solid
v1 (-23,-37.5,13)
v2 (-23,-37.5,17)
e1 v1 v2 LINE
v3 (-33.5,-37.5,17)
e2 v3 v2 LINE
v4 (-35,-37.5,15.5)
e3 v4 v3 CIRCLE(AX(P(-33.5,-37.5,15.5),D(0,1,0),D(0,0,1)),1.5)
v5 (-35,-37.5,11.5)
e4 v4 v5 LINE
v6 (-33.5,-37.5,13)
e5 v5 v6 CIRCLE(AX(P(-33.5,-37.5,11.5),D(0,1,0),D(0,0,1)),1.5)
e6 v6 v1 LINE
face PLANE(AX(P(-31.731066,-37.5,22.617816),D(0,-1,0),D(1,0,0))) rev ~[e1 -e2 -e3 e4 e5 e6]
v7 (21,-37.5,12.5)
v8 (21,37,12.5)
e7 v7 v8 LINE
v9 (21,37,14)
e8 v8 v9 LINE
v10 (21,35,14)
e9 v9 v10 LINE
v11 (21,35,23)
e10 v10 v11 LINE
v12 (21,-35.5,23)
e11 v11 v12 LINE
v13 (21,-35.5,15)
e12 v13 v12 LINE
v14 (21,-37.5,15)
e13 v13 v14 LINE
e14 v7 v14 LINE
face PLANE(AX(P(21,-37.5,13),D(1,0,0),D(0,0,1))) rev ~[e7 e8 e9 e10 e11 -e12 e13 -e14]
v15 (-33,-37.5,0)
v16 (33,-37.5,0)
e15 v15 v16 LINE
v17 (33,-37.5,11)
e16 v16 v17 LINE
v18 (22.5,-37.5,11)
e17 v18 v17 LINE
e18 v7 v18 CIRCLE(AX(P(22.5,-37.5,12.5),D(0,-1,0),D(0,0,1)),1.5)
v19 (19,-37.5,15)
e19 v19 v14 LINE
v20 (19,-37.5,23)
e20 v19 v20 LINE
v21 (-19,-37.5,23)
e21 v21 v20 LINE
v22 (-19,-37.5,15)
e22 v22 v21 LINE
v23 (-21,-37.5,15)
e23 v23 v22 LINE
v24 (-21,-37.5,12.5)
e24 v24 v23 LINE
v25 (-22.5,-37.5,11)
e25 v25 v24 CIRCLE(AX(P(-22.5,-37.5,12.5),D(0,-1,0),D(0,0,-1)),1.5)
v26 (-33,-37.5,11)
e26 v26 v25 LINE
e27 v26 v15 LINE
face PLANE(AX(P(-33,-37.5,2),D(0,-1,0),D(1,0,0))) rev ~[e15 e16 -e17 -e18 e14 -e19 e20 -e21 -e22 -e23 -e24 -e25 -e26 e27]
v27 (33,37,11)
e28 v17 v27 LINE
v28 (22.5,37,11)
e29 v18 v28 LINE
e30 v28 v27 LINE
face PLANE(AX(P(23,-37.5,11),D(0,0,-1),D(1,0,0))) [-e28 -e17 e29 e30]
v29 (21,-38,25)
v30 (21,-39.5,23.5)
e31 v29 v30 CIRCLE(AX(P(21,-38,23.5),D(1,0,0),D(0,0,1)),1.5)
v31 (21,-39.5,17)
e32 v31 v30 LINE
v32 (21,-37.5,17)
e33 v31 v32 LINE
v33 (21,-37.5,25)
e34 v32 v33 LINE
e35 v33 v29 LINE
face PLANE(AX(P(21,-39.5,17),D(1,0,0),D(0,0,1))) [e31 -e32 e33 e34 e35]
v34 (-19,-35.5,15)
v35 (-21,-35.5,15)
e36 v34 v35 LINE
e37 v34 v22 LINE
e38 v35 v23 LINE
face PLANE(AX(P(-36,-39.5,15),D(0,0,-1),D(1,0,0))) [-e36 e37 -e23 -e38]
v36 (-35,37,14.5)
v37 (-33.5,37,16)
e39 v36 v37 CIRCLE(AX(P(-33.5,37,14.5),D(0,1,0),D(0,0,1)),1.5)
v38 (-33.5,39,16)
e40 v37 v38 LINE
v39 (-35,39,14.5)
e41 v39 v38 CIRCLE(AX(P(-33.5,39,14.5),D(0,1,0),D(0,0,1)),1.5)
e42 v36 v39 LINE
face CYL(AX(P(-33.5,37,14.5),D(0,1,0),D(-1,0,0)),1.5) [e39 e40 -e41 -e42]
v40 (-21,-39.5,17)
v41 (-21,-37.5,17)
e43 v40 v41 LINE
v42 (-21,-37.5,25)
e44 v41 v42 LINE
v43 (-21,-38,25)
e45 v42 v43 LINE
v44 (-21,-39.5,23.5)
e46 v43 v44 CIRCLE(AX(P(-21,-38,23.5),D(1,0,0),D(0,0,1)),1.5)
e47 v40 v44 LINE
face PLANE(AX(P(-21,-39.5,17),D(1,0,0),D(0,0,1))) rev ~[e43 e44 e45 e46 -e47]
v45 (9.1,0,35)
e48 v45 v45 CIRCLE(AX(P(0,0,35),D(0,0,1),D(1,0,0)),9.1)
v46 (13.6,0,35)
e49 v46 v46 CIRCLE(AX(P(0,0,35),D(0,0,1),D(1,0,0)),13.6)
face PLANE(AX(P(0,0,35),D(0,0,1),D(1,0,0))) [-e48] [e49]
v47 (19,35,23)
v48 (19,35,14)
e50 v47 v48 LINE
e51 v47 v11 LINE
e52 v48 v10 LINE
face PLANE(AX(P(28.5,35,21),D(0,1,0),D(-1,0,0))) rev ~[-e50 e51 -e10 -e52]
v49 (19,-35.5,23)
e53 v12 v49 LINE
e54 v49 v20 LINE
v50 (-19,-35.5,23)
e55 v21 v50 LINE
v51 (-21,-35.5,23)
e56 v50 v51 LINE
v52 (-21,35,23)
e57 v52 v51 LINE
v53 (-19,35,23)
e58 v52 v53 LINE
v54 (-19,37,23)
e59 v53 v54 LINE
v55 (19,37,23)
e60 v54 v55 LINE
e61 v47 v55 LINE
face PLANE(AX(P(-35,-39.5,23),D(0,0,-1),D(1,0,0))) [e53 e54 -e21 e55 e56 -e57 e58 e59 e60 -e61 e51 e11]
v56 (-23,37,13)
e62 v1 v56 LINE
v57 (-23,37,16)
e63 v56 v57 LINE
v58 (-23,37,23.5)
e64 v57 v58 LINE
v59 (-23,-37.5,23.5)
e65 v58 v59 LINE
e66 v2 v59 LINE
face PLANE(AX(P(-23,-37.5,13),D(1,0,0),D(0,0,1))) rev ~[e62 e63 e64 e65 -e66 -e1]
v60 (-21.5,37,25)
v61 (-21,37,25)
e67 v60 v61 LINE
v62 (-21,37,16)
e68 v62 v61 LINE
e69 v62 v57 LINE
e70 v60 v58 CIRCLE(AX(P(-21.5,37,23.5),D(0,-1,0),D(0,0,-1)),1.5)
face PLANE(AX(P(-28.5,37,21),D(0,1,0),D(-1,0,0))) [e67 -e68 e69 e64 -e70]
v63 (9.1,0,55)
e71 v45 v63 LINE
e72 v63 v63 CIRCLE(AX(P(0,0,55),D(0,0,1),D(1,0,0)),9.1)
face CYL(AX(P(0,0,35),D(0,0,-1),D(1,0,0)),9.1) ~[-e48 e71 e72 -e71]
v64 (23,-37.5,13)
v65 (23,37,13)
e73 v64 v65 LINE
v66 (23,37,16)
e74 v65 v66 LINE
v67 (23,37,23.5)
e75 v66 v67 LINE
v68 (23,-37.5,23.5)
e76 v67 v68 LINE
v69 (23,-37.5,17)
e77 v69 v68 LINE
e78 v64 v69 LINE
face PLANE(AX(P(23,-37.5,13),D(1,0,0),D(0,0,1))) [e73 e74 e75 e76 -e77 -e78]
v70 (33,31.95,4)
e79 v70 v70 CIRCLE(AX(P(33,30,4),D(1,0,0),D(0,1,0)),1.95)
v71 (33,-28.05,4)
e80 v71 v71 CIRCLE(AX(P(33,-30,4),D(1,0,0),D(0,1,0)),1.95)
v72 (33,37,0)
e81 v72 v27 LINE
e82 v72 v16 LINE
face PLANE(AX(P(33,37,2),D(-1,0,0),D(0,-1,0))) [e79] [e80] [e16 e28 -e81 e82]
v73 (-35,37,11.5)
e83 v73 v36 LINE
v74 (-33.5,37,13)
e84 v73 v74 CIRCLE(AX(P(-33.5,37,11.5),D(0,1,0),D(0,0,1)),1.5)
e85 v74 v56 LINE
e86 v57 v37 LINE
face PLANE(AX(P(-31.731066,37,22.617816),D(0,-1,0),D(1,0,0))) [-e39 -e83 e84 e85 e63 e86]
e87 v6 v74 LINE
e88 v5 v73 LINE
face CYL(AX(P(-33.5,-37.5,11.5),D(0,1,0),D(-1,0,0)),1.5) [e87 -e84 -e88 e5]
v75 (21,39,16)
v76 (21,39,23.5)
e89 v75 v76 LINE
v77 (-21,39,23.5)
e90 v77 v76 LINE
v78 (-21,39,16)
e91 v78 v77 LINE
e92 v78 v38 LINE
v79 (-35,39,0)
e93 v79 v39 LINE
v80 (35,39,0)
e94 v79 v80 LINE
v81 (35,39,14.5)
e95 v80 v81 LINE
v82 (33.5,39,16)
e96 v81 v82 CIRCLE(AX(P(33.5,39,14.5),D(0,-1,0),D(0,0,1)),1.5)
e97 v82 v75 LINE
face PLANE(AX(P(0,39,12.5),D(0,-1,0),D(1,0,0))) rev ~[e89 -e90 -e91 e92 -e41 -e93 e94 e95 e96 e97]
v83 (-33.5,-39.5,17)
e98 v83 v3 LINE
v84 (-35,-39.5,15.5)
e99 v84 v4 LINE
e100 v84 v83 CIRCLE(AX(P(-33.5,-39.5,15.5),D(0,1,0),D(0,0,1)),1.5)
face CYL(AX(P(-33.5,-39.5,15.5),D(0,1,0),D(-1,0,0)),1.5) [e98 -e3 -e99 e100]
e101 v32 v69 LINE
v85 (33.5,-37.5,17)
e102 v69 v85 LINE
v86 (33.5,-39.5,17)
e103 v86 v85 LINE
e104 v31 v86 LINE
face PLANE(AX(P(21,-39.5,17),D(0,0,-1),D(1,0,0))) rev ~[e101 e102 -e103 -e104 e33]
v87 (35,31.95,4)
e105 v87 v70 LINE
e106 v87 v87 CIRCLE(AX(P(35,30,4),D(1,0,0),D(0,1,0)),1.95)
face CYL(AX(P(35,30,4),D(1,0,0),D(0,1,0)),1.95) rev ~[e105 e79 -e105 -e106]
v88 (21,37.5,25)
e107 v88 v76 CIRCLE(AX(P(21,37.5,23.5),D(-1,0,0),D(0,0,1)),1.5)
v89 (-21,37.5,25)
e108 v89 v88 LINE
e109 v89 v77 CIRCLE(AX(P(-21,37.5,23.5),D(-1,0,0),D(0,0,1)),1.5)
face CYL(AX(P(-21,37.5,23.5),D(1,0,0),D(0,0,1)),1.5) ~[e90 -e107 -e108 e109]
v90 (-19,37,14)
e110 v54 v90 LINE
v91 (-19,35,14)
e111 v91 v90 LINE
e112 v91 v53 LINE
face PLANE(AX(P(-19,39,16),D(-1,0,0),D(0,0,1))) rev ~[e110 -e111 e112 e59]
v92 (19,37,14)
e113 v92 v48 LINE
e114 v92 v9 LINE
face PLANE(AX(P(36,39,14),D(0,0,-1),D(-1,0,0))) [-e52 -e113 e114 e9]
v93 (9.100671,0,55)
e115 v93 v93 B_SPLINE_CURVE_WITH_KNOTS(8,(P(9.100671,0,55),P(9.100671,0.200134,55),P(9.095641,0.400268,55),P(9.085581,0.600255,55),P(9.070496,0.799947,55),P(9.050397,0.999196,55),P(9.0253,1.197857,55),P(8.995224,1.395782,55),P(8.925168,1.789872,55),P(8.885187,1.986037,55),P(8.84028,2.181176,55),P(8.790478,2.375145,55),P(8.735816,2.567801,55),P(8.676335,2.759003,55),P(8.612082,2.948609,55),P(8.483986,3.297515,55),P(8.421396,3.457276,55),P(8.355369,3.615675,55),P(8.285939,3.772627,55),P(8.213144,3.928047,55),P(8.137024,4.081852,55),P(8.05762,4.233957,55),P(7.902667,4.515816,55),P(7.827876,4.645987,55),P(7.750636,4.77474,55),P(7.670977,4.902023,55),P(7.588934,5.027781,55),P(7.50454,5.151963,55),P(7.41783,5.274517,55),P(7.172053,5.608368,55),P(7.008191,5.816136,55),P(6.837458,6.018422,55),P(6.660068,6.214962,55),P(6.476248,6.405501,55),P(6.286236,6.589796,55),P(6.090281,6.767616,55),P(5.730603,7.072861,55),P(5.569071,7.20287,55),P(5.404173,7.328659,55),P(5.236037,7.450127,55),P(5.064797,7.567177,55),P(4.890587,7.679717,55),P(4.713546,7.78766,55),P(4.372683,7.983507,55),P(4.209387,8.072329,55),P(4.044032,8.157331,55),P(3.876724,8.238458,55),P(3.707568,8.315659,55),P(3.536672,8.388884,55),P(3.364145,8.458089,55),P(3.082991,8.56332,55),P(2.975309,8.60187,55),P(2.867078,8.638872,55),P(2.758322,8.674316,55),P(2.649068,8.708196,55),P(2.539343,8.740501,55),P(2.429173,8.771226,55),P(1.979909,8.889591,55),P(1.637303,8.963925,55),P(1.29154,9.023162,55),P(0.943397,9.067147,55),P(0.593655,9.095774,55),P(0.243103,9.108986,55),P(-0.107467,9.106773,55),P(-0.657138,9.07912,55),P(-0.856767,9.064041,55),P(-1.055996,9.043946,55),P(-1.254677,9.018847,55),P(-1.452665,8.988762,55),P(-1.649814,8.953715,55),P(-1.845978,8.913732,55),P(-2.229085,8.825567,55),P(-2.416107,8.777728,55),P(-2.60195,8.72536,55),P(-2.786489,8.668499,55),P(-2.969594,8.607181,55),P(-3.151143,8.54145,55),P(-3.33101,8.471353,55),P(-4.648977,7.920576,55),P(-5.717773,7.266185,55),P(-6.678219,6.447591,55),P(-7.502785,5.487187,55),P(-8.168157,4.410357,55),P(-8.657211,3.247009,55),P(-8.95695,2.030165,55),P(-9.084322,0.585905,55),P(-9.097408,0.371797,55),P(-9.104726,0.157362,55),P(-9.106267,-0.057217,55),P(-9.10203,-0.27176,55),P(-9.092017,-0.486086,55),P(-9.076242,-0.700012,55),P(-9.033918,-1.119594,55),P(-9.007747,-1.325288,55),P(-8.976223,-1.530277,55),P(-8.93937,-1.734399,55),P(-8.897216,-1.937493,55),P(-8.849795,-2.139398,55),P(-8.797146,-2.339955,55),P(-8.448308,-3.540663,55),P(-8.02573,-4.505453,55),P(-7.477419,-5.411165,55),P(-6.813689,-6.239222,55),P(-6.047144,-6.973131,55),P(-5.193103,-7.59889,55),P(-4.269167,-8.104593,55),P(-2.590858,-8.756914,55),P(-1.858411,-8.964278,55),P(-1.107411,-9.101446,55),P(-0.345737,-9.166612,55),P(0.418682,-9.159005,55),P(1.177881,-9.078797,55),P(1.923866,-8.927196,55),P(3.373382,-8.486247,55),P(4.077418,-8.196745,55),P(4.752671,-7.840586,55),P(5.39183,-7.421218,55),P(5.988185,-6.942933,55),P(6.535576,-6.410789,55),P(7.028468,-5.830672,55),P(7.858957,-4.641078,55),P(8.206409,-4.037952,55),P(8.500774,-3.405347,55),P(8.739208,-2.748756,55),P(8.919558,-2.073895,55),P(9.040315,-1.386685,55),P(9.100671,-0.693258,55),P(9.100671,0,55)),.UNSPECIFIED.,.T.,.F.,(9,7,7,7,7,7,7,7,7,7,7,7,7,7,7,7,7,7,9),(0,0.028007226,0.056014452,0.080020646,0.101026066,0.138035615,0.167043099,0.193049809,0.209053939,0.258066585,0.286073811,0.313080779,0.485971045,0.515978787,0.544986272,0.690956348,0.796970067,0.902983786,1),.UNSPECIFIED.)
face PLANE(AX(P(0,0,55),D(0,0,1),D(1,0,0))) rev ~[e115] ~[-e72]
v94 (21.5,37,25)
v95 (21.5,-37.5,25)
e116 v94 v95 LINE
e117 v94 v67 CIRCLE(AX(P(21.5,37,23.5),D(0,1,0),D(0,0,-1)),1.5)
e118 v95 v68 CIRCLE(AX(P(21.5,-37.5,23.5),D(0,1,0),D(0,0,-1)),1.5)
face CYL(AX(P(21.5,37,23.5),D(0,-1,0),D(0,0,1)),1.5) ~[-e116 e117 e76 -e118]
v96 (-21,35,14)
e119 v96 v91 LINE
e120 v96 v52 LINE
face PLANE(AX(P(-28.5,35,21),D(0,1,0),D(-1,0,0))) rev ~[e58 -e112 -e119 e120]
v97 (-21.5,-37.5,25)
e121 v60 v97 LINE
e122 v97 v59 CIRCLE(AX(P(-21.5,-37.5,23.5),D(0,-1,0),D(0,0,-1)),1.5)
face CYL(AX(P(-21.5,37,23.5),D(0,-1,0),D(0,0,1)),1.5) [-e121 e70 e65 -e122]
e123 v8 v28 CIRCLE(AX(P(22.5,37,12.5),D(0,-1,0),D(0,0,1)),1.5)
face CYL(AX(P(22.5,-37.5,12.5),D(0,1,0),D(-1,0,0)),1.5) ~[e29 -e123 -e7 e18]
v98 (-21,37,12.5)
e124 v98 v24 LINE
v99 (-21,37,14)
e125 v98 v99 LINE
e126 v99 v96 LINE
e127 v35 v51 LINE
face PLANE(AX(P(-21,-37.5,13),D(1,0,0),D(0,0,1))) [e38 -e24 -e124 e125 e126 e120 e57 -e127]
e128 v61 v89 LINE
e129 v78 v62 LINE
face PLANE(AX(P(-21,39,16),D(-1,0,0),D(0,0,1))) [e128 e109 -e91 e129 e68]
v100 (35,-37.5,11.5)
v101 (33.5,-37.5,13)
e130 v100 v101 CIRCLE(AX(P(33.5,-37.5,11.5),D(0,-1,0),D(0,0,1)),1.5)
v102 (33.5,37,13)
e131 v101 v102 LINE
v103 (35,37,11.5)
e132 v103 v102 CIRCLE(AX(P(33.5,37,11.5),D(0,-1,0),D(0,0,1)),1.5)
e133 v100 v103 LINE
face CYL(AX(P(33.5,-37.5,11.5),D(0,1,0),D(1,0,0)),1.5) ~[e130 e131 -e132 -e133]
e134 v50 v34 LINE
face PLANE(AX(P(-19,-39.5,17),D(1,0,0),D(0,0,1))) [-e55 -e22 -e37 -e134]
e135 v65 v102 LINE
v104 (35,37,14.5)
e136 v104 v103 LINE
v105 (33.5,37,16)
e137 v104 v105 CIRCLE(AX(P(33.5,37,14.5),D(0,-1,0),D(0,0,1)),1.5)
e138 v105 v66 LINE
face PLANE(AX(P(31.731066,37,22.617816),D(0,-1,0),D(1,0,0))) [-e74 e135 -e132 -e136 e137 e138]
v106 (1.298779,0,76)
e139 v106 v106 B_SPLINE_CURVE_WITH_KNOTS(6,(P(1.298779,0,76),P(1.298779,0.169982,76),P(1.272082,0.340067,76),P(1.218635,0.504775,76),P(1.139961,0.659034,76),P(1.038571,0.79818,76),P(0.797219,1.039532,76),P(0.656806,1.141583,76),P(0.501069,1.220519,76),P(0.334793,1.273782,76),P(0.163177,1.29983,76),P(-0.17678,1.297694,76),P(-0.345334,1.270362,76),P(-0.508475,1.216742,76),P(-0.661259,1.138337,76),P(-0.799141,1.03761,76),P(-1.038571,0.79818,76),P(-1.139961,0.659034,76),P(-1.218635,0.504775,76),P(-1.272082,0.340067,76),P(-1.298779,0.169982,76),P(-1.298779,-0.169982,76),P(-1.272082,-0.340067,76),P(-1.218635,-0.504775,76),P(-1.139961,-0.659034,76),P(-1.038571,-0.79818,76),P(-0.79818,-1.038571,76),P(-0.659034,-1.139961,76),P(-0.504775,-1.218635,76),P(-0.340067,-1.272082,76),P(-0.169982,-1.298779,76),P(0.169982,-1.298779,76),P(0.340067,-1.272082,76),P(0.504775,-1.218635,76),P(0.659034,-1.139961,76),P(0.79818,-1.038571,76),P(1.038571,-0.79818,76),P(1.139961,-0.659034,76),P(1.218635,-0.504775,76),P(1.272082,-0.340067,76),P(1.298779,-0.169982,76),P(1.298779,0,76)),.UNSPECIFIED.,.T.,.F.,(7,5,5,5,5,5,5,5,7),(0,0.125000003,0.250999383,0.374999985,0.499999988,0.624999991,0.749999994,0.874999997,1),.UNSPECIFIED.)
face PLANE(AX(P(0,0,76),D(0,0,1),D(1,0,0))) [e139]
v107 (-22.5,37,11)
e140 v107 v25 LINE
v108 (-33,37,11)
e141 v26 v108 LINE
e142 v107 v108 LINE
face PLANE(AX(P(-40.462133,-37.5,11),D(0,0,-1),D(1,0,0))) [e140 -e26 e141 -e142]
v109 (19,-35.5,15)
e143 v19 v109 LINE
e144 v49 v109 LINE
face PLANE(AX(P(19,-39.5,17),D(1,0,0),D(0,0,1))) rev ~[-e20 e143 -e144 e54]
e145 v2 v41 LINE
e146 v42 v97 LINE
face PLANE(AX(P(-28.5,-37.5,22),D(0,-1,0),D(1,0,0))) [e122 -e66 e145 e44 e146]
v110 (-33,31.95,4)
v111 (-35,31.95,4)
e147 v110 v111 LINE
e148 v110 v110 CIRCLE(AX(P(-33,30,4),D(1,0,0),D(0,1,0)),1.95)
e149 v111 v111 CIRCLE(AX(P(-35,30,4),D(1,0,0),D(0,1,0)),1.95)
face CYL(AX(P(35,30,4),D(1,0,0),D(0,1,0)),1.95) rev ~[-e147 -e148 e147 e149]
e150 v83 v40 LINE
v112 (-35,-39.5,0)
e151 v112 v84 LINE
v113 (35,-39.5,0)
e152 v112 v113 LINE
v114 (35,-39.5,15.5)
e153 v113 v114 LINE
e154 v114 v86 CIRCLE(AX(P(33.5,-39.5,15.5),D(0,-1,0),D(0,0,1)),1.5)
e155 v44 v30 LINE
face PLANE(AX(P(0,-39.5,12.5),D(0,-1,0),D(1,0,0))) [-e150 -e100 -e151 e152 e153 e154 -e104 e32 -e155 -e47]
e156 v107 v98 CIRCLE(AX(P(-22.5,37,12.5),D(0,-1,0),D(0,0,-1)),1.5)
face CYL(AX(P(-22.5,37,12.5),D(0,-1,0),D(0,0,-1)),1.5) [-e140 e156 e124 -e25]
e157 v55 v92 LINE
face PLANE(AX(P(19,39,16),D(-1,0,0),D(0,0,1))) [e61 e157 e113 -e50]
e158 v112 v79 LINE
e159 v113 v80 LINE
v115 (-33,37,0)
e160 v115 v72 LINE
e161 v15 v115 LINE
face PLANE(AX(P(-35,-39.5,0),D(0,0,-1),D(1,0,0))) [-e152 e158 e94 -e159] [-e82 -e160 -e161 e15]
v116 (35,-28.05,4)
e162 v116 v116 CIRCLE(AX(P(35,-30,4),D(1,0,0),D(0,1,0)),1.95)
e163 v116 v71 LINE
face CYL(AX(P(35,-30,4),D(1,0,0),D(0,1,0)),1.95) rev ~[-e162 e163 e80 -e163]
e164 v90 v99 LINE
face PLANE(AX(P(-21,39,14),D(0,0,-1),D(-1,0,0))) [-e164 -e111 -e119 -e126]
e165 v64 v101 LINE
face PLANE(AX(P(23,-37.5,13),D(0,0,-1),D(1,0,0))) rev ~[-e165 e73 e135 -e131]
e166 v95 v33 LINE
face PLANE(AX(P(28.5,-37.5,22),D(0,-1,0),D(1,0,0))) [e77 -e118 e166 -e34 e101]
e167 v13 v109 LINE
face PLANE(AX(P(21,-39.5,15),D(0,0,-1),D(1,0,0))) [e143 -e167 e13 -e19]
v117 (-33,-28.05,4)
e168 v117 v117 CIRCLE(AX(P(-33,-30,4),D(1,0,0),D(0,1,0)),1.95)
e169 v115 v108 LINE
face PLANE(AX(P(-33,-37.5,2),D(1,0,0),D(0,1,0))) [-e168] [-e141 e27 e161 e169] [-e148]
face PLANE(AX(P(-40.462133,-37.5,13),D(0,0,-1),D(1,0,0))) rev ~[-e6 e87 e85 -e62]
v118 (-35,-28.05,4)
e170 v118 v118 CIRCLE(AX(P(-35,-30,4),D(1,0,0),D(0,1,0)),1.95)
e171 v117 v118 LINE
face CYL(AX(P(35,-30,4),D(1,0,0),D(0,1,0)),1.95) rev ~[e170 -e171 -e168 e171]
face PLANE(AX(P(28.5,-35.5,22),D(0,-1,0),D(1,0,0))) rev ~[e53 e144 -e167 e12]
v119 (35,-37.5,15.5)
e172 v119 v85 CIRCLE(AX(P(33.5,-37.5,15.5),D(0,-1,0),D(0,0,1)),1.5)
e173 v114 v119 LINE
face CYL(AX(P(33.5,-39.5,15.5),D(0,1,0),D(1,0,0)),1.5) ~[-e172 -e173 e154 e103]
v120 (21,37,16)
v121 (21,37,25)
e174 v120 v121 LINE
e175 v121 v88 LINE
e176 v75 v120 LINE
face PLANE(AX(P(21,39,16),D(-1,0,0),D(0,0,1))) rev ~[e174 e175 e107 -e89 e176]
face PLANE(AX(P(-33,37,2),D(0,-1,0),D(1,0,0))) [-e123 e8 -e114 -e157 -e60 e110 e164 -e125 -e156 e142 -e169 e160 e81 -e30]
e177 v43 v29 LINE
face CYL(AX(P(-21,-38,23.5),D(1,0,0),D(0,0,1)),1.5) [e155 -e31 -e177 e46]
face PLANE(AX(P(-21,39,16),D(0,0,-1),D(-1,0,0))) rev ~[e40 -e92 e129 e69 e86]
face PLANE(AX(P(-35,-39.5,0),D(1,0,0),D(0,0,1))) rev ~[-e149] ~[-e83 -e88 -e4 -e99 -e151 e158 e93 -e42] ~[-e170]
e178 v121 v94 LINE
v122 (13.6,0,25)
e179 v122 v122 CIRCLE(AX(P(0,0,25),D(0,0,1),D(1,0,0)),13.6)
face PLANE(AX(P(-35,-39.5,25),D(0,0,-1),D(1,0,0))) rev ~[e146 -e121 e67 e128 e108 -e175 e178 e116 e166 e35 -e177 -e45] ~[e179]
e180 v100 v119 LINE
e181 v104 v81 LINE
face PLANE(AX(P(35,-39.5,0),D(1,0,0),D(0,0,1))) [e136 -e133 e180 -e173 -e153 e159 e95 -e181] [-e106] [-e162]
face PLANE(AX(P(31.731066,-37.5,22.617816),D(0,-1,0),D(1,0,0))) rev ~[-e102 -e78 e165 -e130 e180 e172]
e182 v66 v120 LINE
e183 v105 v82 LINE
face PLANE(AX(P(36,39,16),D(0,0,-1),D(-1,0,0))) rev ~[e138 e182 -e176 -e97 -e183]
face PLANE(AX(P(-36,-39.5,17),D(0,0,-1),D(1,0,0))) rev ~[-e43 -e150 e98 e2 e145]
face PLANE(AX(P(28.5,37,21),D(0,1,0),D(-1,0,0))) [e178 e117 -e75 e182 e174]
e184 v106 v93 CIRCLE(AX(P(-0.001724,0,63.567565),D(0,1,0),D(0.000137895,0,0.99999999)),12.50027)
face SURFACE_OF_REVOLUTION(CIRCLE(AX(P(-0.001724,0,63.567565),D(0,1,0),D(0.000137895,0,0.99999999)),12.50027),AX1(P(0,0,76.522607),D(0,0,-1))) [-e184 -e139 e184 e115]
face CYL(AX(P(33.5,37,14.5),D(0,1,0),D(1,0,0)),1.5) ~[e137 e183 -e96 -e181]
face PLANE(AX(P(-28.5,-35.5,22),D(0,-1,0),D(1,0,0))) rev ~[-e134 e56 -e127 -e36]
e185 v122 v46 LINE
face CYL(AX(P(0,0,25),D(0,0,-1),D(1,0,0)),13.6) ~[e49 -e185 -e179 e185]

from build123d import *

# Parameters (mm, degrees)
F1_W      = 70
F1_H      = 25
F2_DEPTH  = 78.5
F3_W      = 15
F3_H      = 10
F4_DEPTH  = 2
F5_W      = 15
F5_H      = 10
F6_DEPTH  = 2
F7_W      = 17.4621326589
F7_H      = 19.2356310288
F8_DEPTH  = 74.5
F10_T     = -2
F11_R     = 1.5
F12_R     = 1.95
F13_DEPTH = 70.001
F14_R     = 13.6
F15_DEPTH = 10
F16_R     = 9.1
F17_DEPTH = 20
F18_R     = 12.5
F19_DEPTH = 21


# Not quite as in the source:
# - a feature of the source that left no trace in its solid (it failed there, or was rolled back) is left out


with BuildPart() as f2:
    # F1 (on offset) → F2 (new body)
    with BuildSketch(Plane.XZ.offset(39.5)):
        with Locations((0, 12.5)):
            Rectangle(F1_W, F1_H)
    extrude(amount=-F2_DEPTH)

    # F3 (on face) → F4 (cut)
    with BuildSketch(Plane.XZ.offset(39.5)):
        with Locations((-28.5, 22)):
            Rectangle(F3_W, F3_H)
        with Locations((28.5, 22)):
            Rectangle(F3_W, F3_H)
    extrude(amount=-F4_DEPTH, mode=Mode.SUBTRACT)

    # F5 (on face) → F6 (cut)
    with BuildSketch(Plane(origin=(0, 39, 0), x_dir=(-1, 0, 0), z_dir=(0, 1, 0))):
        with Locations((-28.5, 21)):
            Rectangle(F5_W, F5_H)
        with Locations((28.5, 21)):
            Rectangle(F5_W, F5_H)
    extrude(amount=-F6_DEPTH, mode=Mode.SUBTRACT)

    # F7 (on face) → F8 (cut)
    with BuildSketch(Plane.XZ.offset(37.5)):
        with Locations((-31.7310663294, 22.6178155144)):
            Rectangle(F7_W, F7_H)
        with Locations((31.7310663294, 22.6178155144)):
            Rectangle(F7_W, F7_H)
    extrude(amount=-F8_DEPTH, mode=Mode.SUBTRACT)

    # F10: a shell. OpenCascade refuses it in one call, so the cavity is built on its own and cut out:
    # the body offset inwards by the wall thickness, plus a prism from it out through each open face.
    f10_core = offset(f2.part, amount=F10_T, kind=Kind.INTERSECTION, mode=Mode.PRIVATE)
    f10_exits = [f10_core.faces().sort_by_distance(p)[0] for p in [
        (0, -0.25, 2),
    ]]
    add(f10_core, mode=Mode.SUBTRACT)
    extrude(f10_exits, amount=-F10_T, mode=Mode.SUBTRACT)

    # F11
    f11_edges = [f2.edges().sort_by_distance(p)[0] for p in [
        (21, -0.25, 11),
        (-21, -0.25, 11),
        (-35, -38.5, 17),
        (-35, 38, 16),
        (-35, -0.25, 13),
        (-23, -0.25, 25),
        (0, -39.5, 25),
        (0, 39, 25),
        (23, -0.25, 25),
        (35, -38.5, 17),
        (35, -0.25, 13),
        (35, 38, 16),
    ]]
    fillet(f11_edges, radius=F11_R)

    # F12 (on face) → F13 (cut, through all)
    with BuildSketch(Plane.YZ.offset(35)):
        with Locations((-30, 4)):
            Circle(F12_R)
        with Locations((30, 4)):
            Circle(F12_R)
    extrude(amount=-F13_DEPTH, mode=Mode.SUBTRACT)

    # F14 (on face) → F15 (join)
    with BuildSketch(Plane.XY.offset(25)):
        Circle(F14_R)
    extrude(amount=F15_DEPTH)

    # F16 (on face) → F17 (join)
    with BuildSketch(Plane.XY.offset(35)):
        Circle(F16_R)
    extrude(amount=F17_DEPTH)

    # F18 (on face) → F19 (join)
    with BuildSketch(Plane.XY.offset(55)):
        Circle(F18_R)
    extrude(amount=F19_DEPTH)

    # F20 (on Front) → F21 (revolve, cut)
    with BuildSketch(Plane.XZ):
        with BuildLine():
            ThreePointArc((0, 76.0678347956), (11.4737550942, 68.5243920963), (9.100375697, 54.9996867776))
            Line((9.100375697, 54.9996867776), (14.105156064, 54.9996867776))
            Line((14.105156064, 54.9996867776), (14.105156064, 76.9773796201))
            Line((14.105156064, 76.9773796201), (0, 76.9773796201))
            Line((0, 76.9773796201), (0, 76.0678347956))
        make_face()
    revolve(axis=Axis((0, 0, 76.5226072078), (0, 0, -1)), mode=Mode.SUBTRACT)


solid = f2.part
